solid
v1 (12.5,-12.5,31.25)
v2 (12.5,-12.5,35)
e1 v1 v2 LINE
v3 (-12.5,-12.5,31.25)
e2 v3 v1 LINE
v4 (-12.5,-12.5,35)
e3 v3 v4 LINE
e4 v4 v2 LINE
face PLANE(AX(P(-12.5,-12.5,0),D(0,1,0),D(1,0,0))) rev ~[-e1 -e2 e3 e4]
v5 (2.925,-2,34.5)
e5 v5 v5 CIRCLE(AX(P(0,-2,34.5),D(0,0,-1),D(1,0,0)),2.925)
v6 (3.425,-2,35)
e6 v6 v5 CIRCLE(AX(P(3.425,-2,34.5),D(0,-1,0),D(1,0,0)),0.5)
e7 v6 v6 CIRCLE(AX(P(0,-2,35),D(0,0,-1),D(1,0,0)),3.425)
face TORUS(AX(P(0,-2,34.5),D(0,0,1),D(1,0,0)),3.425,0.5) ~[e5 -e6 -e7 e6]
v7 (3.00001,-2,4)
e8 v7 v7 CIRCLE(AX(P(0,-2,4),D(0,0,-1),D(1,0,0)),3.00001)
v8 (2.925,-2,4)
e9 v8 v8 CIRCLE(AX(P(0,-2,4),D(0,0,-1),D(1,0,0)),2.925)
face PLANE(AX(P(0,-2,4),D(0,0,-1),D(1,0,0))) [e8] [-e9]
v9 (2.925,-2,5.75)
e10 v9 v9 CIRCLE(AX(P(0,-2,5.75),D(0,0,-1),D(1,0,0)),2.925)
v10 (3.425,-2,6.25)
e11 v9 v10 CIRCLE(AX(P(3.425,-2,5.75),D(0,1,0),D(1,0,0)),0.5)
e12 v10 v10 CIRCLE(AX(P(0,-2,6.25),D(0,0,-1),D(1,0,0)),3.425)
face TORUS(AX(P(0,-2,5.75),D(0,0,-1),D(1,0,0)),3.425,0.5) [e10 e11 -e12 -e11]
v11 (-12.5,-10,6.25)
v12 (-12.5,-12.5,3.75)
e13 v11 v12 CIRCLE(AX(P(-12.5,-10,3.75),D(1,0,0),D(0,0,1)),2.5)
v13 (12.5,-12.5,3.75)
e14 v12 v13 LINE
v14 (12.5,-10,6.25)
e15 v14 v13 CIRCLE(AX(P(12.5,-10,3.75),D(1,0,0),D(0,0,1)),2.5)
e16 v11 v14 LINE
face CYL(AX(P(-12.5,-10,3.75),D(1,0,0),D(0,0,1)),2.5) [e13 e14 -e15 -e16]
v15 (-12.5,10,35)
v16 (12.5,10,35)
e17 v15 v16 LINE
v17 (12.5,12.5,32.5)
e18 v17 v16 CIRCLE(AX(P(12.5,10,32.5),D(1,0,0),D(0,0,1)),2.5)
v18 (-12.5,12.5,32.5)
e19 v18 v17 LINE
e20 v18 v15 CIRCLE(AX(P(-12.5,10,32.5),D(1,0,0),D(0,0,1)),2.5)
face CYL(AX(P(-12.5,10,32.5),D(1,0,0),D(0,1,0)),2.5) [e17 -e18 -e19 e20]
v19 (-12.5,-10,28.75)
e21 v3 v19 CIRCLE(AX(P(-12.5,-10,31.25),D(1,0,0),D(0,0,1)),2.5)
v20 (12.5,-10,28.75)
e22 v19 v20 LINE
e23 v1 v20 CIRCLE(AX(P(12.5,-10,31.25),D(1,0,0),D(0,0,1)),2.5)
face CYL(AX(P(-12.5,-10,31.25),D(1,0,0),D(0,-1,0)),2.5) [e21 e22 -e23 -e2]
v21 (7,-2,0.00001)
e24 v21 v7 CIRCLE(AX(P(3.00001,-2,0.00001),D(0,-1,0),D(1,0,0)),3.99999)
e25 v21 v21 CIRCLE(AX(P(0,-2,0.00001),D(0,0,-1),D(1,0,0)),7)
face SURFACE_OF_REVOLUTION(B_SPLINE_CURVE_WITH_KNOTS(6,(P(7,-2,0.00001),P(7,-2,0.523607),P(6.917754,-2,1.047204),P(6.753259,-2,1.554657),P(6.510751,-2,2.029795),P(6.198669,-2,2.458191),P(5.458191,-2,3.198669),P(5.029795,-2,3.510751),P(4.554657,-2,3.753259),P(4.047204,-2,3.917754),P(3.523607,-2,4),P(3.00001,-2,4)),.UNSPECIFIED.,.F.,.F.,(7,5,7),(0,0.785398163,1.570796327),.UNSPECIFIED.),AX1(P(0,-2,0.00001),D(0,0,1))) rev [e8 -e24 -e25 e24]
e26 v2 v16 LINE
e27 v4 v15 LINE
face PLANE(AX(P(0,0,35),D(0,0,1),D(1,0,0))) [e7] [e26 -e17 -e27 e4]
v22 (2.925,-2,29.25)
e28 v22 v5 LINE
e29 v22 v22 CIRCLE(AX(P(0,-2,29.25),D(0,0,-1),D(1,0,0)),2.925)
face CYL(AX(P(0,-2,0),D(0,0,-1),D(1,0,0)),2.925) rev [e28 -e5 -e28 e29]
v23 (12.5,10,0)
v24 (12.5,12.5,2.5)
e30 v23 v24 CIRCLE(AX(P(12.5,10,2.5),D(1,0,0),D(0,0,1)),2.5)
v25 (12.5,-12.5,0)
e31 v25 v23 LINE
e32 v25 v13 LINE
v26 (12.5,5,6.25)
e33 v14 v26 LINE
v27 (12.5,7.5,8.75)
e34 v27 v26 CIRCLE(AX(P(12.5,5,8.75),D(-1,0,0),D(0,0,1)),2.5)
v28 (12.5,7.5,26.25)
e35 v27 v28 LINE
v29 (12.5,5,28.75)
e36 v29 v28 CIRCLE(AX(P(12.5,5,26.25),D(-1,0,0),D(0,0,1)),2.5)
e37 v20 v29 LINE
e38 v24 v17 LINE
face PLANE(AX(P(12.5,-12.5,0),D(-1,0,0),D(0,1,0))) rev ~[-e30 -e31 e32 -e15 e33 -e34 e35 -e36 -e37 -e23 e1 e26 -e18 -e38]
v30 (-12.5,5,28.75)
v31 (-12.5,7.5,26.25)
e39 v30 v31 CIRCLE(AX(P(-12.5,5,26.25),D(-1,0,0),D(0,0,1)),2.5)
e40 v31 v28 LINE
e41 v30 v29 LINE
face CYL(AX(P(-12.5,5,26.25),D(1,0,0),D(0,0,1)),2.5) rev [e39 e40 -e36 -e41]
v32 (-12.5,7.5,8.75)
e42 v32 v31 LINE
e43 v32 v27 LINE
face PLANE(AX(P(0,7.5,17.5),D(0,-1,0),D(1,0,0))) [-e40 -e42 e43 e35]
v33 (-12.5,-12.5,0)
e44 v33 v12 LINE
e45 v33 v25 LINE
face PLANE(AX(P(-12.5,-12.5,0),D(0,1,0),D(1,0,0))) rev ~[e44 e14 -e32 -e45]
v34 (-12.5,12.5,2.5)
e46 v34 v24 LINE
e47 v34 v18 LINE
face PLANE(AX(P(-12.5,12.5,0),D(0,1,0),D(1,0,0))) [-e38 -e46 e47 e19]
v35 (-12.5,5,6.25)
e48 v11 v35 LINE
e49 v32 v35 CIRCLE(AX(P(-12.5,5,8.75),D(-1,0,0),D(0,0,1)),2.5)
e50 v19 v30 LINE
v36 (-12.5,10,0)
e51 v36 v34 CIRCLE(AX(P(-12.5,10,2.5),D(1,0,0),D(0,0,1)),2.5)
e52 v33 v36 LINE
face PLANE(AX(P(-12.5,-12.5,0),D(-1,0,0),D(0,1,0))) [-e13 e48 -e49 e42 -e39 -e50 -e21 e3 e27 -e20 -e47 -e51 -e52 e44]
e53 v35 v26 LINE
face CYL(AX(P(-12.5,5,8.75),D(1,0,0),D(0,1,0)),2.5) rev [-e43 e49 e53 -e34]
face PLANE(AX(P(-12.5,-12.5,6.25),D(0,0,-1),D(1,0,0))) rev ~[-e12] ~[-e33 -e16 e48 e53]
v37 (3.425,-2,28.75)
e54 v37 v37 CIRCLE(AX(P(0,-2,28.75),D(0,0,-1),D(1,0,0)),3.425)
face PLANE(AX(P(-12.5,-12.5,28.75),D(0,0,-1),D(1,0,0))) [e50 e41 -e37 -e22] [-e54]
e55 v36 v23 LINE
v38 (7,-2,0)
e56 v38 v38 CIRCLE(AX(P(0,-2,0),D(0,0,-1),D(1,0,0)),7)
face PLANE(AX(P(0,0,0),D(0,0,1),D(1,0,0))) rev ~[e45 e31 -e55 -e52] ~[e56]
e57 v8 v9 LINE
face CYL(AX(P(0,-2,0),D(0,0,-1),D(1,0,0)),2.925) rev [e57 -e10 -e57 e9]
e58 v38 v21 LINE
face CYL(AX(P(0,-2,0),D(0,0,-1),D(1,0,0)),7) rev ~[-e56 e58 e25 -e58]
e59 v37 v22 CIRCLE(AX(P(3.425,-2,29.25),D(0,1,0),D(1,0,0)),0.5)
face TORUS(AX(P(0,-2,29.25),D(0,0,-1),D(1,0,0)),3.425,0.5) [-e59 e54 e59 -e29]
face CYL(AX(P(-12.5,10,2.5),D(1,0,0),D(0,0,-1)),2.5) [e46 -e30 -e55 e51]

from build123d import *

# Parameters (mm, degrees)
F0_W     = 25
F0_H     = 25
F0_R     = 7
F0_R_2   = 2.925
F1_DEPTH = 35
F2_W     = 25
F2_H     = 22.5
F3_DEPTH = 20
F4_DEPTH = 35.001
F5_R     = 7
F6_DEPTH = 4
F7_R     = 2.5
F8_R     = 3.99999
F9_R     = 0.5


# Not quite as in the source:
# - a fillet or chamfer is up to 0.001 mm smaller than in the source, because OpenCascade refuses the exact size


with BuildPart() as f1:
    # F0 (on Top) → F1 (new body)
    with BuildSketch(Plane.XY):
        Rectangle(F0_W, F0_H)
        with Locations((0, -2)):
            Circle(F0_R, mode=Mode.SUBTRACT)
        with Locations((0, -2)):
            Circle(F0_R)
        with Locations((0, -2)):
            Circle(F0_R_2, mode=Mode.SUBTRACT)
        with Locations((0, -2)):
            Circle(F0_R_2)
    extrude(amount=F1_DEPTH)

    # F2 (on face) → F3 (cut)
    with BuildSketch(Plane.XZ.offset(12.5)):
        with Locations((0, 17.5)):
            Rectangle(F2_W, F2_H)
    extrude(amount=-F3_DEPTH, mode=Mode.SUBTRACT)

    # F0 (on Top) → F4 (cut, through all)
    with BuildSketch(Plane.XY):
        with Locations((0, -2)):
            Circle(F0_R_2)
    extrude(amount=F4_DEPTH, mode=Mode.SUBTRACT)

    # F5 (on face) → F6 (cut)
    with BuildSketch(Plane(origin=(0, 0, 0), x_dir=(1, 0, 0), z_dir=(0, 0, -1))):
        with Locations((0, 2)):
            Circle(F5_R)
    extrude(amount=-F6_DEPTH, mode=Mode.SUBTRACT)

    # F7
    f7_edges = [f1.edges().sort_by_distance(p)[0] for p in [
        (0, 7.5, 6.25),
        (0, 7.5, 28.75),
        (0, 12.5, 35),
        (0, 12.5, 0),
        (0, -12.5, 28.75),
        (0, -12.5, 6.25),
    ]]
    fillet(f7_edges, radius=F7_R)

    # F8 (radius 4 in the source; OpenCascade refuses exactly that, so slightly less here)
    f8_edges = [f1.edges().sort_by_distance(p)[0] for p in [
        (-7, -2, 4),
    ]]
    fillet(f8_edges, radius=F8_R)

    # F9
    f9_edges = [f1.edges().sort_by_distance(p)[0] for p in [
        (-2.925, -2, 35),
        (-2.925, -2, 28.75),
        (-2.925, -2, 6.25),
    ]]
    fillet(f9_edges, radius=F9_R)


solid = f1.part
